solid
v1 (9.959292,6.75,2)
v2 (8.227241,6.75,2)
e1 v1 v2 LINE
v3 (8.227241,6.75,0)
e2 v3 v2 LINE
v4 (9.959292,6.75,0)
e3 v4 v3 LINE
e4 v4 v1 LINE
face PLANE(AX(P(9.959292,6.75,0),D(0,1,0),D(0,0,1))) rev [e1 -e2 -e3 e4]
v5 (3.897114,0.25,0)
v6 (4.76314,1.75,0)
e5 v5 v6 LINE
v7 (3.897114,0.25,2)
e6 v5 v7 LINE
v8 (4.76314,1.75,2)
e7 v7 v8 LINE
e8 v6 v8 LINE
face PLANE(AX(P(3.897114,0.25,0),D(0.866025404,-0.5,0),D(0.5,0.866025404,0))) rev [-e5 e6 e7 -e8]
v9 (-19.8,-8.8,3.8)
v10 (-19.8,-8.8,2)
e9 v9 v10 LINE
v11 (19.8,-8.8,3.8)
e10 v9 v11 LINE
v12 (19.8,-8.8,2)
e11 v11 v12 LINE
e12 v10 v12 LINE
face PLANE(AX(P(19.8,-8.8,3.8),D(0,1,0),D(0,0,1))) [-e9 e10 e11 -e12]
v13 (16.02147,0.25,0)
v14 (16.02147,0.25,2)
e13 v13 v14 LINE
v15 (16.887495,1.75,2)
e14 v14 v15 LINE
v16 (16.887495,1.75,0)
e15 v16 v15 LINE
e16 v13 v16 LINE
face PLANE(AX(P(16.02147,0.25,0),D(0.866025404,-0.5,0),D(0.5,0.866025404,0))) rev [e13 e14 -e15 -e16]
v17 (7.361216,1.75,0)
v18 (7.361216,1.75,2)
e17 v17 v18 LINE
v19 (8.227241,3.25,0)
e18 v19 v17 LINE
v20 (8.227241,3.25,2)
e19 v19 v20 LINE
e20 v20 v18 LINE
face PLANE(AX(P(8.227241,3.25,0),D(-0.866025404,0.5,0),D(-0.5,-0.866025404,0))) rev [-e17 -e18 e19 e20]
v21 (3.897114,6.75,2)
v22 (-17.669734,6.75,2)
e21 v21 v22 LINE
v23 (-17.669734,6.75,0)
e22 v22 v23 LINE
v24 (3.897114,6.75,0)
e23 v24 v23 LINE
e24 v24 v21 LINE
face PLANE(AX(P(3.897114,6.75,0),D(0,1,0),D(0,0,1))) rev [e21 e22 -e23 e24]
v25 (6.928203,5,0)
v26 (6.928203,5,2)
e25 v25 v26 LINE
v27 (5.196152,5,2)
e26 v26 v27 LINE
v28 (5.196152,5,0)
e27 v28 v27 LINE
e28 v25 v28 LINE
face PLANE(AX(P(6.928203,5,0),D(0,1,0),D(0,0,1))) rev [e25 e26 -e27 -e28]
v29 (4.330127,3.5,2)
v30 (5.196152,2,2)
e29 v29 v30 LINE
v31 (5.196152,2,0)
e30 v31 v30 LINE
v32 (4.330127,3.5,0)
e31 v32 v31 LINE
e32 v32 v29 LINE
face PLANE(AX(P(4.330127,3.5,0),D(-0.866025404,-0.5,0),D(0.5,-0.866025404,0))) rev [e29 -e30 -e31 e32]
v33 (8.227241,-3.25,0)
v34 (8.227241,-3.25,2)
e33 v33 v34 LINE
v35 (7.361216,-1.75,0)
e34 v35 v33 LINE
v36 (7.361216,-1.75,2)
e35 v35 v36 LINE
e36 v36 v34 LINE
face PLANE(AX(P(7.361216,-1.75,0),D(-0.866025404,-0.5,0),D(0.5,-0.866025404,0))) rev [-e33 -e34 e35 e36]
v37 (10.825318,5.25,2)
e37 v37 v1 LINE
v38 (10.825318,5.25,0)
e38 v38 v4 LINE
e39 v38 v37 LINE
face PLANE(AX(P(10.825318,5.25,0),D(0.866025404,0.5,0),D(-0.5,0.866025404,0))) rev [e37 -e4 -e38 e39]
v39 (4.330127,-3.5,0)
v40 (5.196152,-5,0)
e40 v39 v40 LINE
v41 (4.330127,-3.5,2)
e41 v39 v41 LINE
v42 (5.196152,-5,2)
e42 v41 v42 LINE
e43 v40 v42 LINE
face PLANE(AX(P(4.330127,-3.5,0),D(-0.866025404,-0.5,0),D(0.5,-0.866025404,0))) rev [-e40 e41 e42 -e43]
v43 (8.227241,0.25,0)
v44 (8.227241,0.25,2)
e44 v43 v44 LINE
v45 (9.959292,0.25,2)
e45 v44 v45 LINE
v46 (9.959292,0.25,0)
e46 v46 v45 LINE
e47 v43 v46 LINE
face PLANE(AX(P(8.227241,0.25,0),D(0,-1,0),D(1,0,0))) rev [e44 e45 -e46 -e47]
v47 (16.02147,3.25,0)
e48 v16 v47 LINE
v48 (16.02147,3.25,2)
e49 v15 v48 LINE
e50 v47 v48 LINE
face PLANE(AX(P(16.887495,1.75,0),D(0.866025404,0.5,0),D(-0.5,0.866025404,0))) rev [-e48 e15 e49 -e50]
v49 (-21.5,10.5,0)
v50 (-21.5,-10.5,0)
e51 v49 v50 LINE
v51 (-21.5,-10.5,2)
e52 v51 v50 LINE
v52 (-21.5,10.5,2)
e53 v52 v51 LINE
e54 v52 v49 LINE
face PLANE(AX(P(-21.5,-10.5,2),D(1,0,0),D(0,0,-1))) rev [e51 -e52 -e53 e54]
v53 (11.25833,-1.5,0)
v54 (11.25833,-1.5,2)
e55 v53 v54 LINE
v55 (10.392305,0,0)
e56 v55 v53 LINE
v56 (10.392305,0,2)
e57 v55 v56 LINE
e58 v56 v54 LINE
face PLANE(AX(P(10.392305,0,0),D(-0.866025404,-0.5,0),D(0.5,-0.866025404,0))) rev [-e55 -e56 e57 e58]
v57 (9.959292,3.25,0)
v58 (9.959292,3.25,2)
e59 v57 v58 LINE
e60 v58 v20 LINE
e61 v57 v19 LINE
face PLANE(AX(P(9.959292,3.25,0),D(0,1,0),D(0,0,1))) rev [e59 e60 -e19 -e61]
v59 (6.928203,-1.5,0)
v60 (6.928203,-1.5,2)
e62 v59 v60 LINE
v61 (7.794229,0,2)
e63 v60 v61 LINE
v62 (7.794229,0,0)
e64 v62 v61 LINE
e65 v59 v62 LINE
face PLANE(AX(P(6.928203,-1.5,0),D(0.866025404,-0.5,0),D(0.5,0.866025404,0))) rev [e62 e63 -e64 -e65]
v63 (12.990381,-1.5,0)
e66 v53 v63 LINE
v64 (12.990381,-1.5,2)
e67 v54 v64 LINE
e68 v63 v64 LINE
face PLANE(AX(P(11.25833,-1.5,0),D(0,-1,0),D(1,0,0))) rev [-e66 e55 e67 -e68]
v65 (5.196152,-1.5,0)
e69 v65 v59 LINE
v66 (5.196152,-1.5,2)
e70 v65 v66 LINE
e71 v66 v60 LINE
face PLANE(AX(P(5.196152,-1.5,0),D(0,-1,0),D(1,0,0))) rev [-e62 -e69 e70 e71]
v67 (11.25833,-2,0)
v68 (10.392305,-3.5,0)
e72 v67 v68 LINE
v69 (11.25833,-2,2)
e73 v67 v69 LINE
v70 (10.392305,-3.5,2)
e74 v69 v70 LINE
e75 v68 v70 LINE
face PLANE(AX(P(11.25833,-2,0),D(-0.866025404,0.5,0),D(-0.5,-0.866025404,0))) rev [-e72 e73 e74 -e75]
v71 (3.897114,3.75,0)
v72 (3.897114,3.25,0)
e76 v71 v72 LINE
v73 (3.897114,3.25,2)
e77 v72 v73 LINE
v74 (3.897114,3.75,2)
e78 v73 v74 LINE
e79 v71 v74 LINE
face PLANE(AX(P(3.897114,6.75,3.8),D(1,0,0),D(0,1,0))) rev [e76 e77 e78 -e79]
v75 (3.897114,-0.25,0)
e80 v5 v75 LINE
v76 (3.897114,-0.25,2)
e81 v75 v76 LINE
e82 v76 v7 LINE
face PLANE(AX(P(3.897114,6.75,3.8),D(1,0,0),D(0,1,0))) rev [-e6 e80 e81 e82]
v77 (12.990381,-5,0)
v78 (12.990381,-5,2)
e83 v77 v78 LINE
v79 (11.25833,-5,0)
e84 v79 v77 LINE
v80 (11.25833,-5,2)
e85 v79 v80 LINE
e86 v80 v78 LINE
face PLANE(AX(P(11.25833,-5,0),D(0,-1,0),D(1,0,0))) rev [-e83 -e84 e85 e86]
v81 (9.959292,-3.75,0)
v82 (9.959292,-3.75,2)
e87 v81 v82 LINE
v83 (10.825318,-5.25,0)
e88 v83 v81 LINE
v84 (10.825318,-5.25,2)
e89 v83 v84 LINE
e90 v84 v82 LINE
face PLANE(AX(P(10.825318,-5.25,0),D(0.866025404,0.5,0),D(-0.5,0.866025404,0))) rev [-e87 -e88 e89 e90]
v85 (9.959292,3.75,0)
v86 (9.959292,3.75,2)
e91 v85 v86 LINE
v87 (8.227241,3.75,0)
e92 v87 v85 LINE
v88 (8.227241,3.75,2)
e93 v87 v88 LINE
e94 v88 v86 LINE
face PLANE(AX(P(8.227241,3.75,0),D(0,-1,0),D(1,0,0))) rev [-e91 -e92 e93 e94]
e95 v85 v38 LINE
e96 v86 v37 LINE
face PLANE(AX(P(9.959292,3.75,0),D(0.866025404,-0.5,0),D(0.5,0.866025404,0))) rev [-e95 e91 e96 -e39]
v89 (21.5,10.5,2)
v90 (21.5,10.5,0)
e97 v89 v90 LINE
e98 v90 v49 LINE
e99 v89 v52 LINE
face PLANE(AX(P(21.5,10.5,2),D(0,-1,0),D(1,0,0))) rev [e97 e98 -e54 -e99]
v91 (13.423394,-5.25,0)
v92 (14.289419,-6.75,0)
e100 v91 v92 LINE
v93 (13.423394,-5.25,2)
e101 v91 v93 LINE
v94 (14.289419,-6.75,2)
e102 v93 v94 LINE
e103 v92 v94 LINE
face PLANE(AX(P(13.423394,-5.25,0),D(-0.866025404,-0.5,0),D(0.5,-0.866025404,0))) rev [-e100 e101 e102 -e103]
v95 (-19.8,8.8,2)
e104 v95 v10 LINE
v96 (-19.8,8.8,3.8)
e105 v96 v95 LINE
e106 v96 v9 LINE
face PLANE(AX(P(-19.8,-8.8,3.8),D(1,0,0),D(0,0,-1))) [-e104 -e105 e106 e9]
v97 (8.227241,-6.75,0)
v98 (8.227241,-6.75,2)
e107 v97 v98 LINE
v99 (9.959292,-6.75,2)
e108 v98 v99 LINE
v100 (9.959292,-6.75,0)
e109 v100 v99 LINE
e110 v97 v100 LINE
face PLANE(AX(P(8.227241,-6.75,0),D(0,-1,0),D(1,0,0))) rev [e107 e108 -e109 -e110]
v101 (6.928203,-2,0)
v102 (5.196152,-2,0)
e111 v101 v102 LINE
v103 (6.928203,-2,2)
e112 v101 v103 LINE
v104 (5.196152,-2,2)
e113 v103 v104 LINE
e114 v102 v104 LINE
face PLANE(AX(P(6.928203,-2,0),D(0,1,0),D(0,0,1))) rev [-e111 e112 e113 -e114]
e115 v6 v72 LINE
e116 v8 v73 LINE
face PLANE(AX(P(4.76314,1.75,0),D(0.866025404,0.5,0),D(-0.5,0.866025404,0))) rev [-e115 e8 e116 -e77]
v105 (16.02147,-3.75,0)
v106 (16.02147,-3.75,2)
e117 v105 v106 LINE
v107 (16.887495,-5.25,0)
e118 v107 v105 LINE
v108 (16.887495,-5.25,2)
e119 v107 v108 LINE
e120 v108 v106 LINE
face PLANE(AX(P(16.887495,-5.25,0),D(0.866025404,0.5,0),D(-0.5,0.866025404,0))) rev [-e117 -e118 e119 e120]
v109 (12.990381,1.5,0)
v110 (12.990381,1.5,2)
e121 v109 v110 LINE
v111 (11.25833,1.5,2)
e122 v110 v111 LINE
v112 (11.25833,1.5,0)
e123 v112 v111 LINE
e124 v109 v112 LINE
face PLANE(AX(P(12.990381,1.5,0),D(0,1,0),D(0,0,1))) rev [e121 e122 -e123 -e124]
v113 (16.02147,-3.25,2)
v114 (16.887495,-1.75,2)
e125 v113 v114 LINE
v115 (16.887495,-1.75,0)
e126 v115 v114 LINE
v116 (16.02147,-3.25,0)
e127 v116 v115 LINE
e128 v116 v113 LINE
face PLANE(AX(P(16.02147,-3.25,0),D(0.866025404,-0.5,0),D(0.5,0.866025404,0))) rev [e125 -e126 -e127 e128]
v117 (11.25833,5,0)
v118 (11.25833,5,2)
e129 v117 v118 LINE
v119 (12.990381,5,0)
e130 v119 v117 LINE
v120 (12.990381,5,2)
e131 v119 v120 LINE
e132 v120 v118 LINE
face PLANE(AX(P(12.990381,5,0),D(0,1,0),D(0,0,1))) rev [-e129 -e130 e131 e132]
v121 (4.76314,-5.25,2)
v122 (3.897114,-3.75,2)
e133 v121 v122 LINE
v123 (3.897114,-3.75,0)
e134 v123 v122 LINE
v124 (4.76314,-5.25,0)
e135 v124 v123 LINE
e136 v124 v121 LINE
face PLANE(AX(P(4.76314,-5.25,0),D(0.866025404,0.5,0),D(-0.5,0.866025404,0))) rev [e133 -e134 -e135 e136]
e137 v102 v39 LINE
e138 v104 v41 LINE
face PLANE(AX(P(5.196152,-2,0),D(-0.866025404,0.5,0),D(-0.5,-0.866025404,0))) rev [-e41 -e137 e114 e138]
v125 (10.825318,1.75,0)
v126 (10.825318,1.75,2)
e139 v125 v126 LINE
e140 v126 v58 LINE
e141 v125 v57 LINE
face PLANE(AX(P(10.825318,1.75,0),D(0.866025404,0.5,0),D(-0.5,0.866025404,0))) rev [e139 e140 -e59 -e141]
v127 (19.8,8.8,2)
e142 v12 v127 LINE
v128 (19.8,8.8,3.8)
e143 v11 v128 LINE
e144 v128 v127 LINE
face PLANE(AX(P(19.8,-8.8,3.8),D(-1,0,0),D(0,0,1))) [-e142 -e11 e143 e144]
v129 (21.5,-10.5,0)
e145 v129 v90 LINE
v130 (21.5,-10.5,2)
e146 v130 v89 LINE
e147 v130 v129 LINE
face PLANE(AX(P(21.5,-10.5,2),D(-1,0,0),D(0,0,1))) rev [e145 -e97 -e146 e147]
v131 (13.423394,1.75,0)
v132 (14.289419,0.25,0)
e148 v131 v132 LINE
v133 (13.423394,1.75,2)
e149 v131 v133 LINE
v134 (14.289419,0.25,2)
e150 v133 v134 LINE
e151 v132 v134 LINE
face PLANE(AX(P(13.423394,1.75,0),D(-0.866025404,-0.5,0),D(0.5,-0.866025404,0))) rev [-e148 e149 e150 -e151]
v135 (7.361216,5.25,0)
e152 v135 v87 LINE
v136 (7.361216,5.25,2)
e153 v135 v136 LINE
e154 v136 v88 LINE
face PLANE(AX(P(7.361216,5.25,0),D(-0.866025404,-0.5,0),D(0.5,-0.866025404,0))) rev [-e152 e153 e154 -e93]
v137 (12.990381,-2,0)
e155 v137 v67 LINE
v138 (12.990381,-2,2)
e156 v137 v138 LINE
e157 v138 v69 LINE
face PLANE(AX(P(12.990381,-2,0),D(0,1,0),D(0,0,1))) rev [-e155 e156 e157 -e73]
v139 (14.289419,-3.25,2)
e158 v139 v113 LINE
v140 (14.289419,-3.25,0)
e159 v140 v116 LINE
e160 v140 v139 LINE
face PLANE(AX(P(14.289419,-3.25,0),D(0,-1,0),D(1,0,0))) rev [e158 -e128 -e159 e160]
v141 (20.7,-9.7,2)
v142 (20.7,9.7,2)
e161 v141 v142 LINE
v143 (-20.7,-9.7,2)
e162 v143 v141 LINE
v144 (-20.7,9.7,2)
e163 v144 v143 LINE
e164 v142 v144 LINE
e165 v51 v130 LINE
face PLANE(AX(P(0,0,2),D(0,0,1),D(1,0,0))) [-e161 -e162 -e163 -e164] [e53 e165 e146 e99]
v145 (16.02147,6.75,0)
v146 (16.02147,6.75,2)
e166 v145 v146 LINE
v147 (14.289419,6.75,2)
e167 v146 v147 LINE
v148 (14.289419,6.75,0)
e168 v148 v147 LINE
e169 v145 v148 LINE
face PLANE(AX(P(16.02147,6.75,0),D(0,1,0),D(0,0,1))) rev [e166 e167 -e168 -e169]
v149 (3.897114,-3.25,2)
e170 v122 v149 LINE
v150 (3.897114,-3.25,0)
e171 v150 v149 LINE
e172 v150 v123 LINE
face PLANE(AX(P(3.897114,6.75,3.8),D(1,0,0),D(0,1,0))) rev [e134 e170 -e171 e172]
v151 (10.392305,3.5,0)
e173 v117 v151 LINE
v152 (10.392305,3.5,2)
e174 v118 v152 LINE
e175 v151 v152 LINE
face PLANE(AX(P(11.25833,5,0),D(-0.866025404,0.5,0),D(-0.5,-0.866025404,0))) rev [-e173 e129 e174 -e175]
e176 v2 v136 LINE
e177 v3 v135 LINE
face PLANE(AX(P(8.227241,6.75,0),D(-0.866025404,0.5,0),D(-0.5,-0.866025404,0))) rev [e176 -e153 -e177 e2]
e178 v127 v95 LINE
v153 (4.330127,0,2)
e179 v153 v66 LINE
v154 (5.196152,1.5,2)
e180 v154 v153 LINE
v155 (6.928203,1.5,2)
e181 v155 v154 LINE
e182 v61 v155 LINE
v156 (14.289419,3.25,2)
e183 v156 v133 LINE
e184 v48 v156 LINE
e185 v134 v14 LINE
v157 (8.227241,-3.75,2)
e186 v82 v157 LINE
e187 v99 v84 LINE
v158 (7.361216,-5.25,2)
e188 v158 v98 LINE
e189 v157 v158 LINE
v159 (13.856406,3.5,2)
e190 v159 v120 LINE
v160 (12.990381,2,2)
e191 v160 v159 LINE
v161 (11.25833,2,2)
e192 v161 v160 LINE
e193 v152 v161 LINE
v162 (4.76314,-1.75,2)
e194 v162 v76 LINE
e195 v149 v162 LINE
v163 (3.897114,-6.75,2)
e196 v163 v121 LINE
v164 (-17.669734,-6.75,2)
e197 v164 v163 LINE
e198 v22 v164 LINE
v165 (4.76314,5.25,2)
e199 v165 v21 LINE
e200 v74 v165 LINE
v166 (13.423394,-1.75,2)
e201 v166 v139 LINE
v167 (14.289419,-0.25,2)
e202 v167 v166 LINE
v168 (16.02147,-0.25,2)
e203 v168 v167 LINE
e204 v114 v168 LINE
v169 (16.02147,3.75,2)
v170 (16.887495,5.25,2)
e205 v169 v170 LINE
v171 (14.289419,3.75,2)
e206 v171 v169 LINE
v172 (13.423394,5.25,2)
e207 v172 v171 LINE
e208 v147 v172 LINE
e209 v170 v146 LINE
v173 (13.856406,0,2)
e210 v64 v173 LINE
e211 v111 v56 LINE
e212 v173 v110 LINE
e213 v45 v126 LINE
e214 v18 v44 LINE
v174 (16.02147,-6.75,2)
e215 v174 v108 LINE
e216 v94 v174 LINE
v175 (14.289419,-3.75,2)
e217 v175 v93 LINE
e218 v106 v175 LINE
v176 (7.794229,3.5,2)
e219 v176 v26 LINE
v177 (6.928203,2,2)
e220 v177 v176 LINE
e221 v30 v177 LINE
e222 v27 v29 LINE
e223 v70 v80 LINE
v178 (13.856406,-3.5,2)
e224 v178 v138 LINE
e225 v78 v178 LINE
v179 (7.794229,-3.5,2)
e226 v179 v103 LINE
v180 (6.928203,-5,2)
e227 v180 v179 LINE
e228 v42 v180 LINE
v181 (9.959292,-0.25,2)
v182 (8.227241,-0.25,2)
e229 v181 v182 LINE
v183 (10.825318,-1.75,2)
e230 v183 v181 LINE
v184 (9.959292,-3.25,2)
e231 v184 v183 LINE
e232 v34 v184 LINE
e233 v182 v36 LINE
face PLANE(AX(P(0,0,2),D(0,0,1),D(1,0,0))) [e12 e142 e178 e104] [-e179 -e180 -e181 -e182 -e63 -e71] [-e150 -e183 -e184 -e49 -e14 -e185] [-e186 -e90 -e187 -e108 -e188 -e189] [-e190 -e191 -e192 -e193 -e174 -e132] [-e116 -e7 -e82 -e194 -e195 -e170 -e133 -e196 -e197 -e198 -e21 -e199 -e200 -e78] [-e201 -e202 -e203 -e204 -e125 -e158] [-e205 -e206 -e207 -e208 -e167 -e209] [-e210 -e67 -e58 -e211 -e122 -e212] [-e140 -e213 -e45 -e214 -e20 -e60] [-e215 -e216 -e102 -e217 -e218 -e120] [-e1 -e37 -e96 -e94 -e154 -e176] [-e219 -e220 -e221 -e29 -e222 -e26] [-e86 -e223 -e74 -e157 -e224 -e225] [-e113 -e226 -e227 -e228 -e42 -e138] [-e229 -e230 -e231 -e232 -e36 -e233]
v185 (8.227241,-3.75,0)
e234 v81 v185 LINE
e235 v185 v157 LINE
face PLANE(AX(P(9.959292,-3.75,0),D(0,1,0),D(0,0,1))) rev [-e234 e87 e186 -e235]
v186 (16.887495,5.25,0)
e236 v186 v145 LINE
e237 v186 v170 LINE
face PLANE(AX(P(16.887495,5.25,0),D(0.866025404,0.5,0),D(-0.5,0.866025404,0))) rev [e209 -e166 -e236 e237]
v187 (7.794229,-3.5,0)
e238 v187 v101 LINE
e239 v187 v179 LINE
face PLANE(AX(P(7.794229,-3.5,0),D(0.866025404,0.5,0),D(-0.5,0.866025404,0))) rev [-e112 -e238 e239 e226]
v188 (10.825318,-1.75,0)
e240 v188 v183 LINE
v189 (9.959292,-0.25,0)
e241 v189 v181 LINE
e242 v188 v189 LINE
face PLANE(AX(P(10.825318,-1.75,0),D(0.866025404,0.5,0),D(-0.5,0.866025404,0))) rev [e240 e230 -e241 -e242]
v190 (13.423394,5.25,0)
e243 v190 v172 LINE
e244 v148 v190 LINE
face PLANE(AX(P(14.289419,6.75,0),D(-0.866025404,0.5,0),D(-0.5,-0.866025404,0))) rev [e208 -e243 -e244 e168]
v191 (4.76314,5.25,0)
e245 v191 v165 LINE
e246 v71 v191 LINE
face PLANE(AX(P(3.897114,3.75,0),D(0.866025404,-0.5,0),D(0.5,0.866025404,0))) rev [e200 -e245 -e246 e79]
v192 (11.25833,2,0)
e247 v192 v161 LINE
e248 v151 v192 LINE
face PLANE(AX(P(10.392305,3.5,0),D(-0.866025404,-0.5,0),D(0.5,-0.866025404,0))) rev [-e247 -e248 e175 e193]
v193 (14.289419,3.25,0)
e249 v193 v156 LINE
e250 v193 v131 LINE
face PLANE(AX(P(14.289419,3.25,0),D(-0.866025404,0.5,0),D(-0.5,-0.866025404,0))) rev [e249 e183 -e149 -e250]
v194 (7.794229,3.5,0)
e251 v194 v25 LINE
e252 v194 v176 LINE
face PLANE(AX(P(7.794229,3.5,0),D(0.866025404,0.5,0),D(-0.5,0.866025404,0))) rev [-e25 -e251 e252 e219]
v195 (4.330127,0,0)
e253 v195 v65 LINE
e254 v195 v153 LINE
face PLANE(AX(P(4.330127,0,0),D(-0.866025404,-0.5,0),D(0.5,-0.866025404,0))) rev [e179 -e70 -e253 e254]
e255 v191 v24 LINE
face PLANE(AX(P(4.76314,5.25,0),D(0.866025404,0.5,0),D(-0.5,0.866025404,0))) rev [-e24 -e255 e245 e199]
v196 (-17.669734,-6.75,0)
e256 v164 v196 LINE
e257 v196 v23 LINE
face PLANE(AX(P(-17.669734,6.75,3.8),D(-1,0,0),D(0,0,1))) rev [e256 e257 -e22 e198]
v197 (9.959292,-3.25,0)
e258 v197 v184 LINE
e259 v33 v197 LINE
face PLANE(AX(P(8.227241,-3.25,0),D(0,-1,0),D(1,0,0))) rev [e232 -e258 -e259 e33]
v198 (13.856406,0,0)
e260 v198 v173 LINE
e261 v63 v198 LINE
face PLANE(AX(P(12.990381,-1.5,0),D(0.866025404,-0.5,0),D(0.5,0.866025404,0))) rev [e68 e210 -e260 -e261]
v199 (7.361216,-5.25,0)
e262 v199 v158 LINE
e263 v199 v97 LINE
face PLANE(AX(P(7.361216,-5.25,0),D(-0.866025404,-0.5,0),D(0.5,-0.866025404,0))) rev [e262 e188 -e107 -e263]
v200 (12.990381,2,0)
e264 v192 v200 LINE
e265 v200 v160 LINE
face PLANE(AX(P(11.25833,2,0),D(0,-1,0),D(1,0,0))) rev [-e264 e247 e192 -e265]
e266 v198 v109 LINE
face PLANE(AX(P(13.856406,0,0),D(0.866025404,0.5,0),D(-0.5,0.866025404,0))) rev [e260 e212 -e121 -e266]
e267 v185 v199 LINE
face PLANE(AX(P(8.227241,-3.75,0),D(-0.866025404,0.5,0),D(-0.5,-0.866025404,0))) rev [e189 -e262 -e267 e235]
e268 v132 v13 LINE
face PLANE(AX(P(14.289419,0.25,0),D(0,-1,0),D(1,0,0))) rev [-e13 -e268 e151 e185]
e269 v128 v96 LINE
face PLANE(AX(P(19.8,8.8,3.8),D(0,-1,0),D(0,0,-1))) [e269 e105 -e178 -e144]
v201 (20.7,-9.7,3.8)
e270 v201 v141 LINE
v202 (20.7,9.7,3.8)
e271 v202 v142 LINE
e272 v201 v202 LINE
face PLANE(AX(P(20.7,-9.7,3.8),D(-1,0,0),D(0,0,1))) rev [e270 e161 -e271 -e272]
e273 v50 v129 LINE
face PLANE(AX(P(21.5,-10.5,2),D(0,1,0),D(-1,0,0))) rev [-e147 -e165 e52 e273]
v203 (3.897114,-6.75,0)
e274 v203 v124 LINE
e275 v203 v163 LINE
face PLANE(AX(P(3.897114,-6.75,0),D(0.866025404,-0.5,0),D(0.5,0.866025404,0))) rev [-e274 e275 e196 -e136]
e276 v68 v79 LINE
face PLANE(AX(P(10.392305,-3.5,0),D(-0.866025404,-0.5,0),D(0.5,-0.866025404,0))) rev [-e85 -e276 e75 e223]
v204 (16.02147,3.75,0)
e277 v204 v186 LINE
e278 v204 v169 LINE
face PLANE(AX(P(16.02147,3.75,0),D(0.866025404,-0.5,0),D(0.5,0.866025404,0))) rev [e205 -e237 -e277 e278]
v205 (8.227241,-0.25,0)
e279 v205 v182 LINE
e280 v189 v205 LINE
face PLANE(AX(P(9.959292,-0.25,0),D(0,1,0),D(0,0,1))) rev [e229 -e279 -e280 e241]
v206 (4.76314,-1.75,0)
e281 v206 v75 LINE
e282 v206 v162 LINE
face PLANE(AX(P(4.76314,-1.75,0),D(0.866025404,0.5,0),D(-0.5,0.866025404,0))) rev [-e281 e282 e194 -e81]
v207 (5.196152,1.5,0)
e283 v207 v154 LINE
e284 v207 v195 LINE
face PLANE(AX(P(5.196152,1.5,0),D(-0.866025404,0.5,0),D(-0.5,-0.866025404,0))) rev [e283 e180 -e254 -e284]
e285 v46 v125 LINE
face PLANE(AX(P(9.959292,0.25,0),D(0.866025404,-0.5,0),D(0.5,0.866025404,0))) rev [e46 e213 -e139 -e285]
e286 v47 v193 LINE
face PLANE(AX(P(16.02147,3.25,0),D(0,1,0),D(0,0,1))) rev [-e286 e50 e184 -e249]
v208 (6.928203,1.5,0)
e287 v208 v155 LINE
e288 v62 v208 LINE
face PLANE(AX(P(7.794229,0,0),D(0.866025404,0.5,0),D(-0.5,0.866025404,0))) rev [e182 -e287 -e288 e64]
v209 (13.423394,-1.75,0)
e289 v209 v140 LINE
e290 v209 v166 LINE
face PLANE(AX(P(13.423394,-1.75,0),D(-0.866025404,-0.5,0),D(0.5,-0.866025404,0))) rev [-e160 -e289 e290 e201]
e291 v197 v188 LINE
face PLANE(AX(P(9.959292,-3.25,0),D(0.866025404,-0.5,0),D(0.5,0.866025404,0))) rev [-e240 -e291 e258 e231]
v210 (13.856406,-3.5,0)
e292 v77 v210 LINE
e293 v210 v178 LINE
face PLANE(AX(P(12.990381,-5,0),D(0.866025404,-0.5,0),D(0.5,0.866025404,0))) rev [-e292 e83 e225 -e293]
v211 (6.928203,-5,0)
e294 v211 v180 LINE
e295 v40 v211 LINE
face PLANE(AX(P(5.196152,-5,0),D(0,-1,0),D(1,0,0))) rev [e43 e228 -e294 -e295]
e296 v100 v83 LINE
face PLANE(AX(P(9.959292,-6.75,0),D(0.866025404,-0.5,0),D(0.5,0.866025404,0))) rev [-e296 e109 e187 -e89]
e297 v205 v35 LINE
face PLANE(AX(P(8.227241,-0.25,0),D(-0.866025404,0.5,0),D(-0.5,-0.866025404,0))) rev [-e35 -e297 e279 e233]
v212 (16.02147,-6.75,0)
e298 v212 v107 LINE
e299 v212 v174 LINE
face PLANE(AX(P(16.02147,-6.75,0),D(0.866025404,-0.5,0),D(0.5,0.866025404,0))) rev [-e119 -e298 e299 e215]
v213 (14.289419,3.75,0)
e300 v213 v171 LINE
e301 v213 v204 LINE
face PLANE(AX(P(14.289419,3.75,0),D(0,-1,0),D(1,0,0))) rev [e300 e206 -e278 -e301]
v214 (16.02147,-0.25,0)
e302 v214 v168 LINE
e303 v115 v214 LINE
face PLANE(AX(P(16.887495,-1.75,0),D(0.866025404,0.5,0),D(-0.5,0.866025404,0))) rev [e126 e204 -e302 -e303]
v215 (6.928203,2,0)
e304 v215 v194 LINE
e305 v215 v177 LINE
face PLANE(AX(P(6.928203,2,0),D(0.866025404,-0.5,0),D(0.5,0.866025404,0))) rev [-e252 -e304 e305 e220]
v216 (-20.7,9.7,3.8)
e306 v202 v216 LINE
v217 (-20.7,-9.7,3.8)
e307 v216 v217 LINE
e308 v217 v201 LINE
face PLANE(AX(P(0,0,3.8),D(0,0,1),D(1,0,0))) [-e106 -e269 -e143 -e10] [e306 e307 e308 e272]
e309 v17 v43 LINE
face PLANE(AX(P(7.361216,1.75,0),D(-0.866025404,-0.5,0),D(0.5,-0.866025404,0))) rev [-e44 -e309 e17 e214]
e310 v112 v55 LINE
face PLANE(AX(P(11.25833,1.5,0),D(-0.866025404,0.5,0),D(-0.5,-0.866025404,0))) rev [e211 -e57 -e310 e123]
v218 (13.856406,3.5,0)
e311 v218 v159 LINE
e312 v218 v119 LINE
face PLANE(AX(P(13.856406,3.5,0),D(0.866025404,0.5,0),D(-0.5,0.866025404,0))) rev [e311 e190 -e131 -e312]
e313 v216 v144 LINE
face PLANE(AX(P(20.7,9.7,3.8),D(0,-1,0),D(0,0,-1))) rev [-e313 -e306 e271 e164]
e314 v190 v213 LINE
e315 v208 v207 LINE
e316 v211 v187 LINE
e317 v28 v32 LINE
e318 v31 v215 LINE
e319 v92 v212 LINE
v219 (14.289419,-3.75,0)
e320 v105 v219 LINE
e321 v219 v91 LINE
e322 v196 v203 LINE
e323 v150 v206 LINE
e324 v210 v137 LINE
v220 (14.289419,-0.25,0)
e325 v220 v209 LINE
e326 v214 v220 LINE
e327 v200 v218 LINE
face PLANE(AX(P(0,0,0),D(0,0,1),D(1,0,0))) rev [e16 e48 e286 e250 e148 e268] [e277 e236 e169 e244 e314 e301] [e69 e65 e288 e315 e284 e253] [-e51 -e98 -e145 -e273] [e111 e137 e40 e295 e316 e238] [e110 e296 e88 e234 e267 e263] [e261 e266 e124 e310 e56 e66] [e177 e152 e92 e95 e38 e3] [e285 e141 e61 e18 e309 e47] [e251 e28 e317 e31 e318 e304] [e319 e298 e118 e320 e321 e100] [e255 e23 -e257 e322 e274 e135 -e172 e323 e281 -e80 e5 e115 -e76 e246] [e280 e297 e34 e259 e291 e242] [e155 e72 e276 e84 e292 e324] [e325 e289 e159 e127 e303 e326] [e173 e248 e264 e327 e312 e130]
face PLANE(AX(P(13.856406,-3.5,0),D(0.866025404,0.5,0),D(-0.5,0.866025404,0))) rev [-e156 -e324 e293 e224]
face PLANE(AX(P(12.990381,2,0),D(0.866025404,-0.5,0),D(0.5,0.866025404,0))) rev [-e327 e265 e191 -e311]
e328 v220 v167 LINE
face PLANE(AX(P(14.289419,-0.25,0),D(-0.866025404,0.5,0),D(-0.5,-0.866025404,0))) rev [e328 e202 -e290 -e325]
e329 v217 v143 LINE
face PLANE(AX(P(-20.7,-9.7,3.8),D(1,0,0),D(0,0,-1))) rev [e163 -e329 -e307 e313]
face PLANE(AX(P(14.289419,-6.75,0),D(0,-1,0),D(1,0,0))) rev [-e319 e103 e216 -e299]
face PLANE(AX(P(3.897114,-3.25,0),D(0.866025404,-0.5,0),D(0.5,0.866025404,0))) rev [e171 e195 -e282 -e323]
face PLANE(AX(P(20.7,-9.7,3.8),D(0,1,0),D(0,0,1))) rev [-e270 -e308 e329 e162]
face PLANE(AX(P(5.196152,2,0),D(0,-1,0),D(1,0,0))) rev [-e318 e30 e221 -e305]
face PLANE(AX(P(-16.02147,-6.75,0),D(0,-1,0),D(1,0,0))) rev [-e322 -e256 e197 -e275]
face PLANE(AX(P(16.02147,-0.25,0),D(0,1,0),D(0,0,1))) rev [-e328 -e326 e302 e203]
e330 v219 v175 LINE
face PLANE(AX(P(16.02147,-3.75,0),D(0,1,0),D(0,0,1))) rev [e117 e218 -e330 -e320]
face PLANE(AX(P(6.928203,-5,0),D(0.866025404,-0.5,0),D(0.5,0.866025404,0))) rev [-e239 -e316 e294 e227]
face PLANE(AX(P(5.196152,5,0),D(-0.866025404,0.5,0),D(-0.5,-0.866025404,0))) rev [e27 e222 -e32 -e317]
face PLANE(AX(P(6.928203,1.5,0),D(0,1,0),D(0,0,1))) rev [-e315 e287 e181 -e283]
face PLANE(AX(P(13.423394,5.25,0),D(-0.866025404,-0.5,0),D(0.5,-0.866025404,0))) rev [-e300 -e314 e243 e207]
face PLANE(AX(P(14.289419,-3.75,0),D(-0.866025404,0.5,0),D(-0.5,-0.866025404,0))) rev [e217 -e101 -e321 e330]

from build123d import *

# Parameters (mm, degrees)
SKETCH1_W           = 43
SKETCH1_H           = 21
BOSS_EXTRUDE1_DEPTH = 2
SKETCH2_W           = 41.4
SKETCH2_H           = 19.4
SKETCH2_W_2         = 39.6
SKETCH2_H_2         = 17.6
BOSS_EXTRUDE2_DEPTH = 1.8
CUT_EXTRUDE1_DEPTH  = 25.010414407
FILL_PATTERN1_DEPTH = 2
SKETCH4_W           = 21.566848352
SKETCH4_H           = 13.5
CUT_EXTRUDE4_DEPTH  = 25.226844615


# Read off the part's stored shape, not the designer's step: Fill Pattern1
with BuildPart() as part:
    # Sketch1 → Boss-Extrude1 (new body)
    with BuildSketch(Plane.XY):
        Rectangle(SKETCH1_W, SKETCH1_H)
    extrude(amount=BOSS_EXTRUDE1_DEPTH)

    # Sketch2 → Boss-Extrude2 (add)
    with BuildSketch(Plane.XY.offset(2)):
        Rectangle(SKETCH2_W, SKETCH2_H)
        Rectangle(SKETCH2_W_2, SKETCH2_H_2, mode=Mode.SUBTRACT)
    extrude(amount=BOSS_EXTRUDE2_DEPTH)

    # Sketch3 → Cut-Extrude1 (cut, through all)
    with BuildSketch(Plane.XY.offset(2)):
        Polygon((-0.866025404, 1.5), (-1.732050808, 0), (-0.866025404, -1.5), (0.866025404, -1.5), (1.732050808, 0), (0.866025404, 1.5), align=None)
    extrude(amount=-CUT_EXTRUDE1_DEPTH, mode=Mode.SUBTRACT)

    # Fill Pattern1 outline → Fill Pattern1 (cut)
    with BuildSketch(Plane.XY):
        Polygon((7.794228634, 0), (6.92820323, 1.5), (5.196152423, 1.5), (4.330127019, 0), (5.196152423, -1.5), (6.92820323, -1.5), align=None)
        Polygon((13.856406461, 0), (12.990381057, 1.5), (11.258330249, 1.5), (10.392304845, 0), (11.258330249, -1.5), (12.990381057, -1.5), align=None)
        Polygon((-4.330127019, 0), (-5.196152423, 1.5), (-6.92820323, 1.5), (-7.794228634, 0), (-6.92820323, -1.5), (-5.196152423, -1.5), align=None)
        Polygon((-10.392304845, 0), (-11.258330249, 1.5), (-12.990381057, 1.5), (-13.856406461, 0), (-12.990381057, -1.5), (-11.258330249, -1.5), align=None)
        Polygon((-2.165063509, 3.75), (-1.299038106, 5.25), (-2.165063509, 6.75), (-3.897114317, 6.75), (-4.763139721, 5.25), (-3.897114317, 3.75), align=None)
        Polygon((3.897114317, -6.75), (4.763139721, -5.25), (3.897114317, -3.75), (2.165063509, -3.75), (1.299038106, -5.25), (2.165063509, -6.75), align=None)
        Polygon((-3.897114317, -6.75), (-2.165063509, -6.75), (-1.299038106, -5.25), (-2.165063509, -3.75), (-3.897114317, -3.75), (-4.763139721, -5.25), align=None)
        Polygon((2.165063509, 3.75), (3.897114317, 3.75), (4.763139721, 5.25), (3.897114317, 6.75), (2.165063509, 6.75), (1.299038106, 5.25), align=None)
        Polygon((16.887495374, -5.25), (16.02146997, -3.75), (14.289419162, -3.75), (13.423393759, -5.25), (14.289419162, -6.75), (16.02146997, -6.75), align=None)
        Polygon((-7.361215932, -5.25), (-8.227241336, -3.75), (-9.959292144, -3.75), (-10.825317547, -5.25), (-9.959292144, -6.75), (-8.227241336, -6.75), align=None)
        Polygon((10.825317547, -5.25), (9.959292144, -3.75), (8.227241336, -3.75), (7.361215932, -5.25), (8.227241336, -6.75), (9.959292144, -6.75), align=None)
        Polygon((-13.423393759, -5.25), (-14.289419162, -3.75), (-16.02146997, -3.75), (-16.887495374, -5.25), (-16.02146997, -6.75), (-14.289419162, -6.75), align=None)
        Polygon((9.959292144, 3.75), (10.825317547, 5.25), (9.959292144, 6.75), (8.227241336, 6.75), (7.361215932, 5.25), (8.227241336, 3.75), align=None)
        Polygon((-10.392304845, 3.5), (-11.258330249, 5), (-12.990381057, 5), (-13.856406461, 3.5), (-12.990381057, 2), (-11.258330249, 2), align=None)
        Polygon((13.856406461, 3.5), (12.990381057, 5), (11.258330249, 5), (10.392304845, 3.5), (11.258330249, 2), (12.990381057, 2), align=None)
        Polygon((1.732050808, 3.5), (0.866025404, 5), (-0.866025404, 5), (-1.732050808, 3.5), (-0.866025404, 2), (0.866025404, 2), align=None)
        Polygon((-4.330127019, 3.5), (-5.196152423, 5), (-6.92820323, 5), (-7.794228634, 3.5), (-6.92820323, 2), (-5.196152423, 2), align=None)
        Polygon((7.794228634, 3.5), (6.92820323, 5), (5.196152423, 5), (4.330127019, 3.5), (5.196152423, 2), (6.92820323, 2), align=None)
        Polygon((-8.227241336, -3.25), (-7.361215932, -1.75), (-8.227241336, -0.25), (-9.959292144, -0.25), (-10.825317547, -1.75), (-9.959292144, -3.25), align=None)
        Polygon((-16.02146997, -3.25), (-14.289419162, -3.25), (-13.423393759, -1.75), (-14.289419162, -0.25), (-16.02146997, -0.25), (-16.887495374, -1.75), align=None)
        Polygon((-7.361215932, 5.25), (-8.227241336, 6.75), (-9.959292144, 6.75), (-10.825317547, 5.25), (-9.959292144, 3.75), (-8.227241336, 3.75), align=None)
        Polygon((-13.423393759, 5.25), (-14.289419162, 6.75), (-16.02146997, 6.75), (-16.887495374, 5.25), (-16.02146997, 3.75), (-14.289419162, 3.75), align=None)
        Polygon((16.887495374, 5.25), (16.02146997, 6.75), (14.289419162, 6.75), (13.423393759, 5.25), (14.289419162, 3.75), (16.02146997, 3.75), align=None)
        Polygon((-13.423393759, 1.75), (-14.289419162, 3.25), (-16.02146997, 3.25), (-16.887495374, 1.75), (-16.02146997, 0.25), (-14.289419162, 0.25), align=None)
        Polygon((10.825317547, 1.75), (9.959292144, 3.25), (8.227241336, 3.25), (7.361215932, 1.75), (8.227241336, 0.25), (9.959292144, 0.25), align=None)
        Polygon((16.887495374, 1.75), (16.02146997, 3.25), (14.289419162, 3.25), (13.423393759, 1.75), (14.289419162, 0.25), (16.02146997, 0.25), align=None)
        Polygon((-1.299038106, 1.75), (-2.165063509, 3.25), (-3.897114317, 3.25), (-4.763139721, 1.75), (-3.897114317, 0.25), (-2.165063509, 0.25), align=None)
        Polygon((-7.361215932, 1.75), (-8.227241336, 3.25), (-9.959292144, 3.25), (-10.825317547, 1.75), (-9.959292144, 0.25), (-8.227241336, 0.25), align=None)
        Polygon((4.763139721, 1.75), (3.897114317, 3.25), (2.165063509, 3.25), (1.299038106, 1.75), (2.165063509, 0.25), (3.897114317, 0.25), align=None)
        Polygon((-11.258330249, -5), (-10.392304845, -3.5), (-11.258330249, -2), (-12.990381057, -2), (-13.856406461, -3.5), (-12.990381057, -5), align=None)
        Polygon((4.763139721, -1.75), (3.897114317, -0.25), (2.165063509, -0.25), (1.299038106, -1.75), (2.165063509, -3.25), (3.897114317, -3.25), align=None)
        Polygon((16.887495374, -1.75), (16.02146997, -0.25), (14.289419162, -0.25), (13.423393759, -1.75), (14.289419162, -3.25), (16.02146997, -3.25), align=None)
        Polygon((10.825317547, -1.75), (9.959292144, -0.25), (8.227241336, -0.25), (7.361215932, -1.75), (8.227241336, -3.25), (9.959292144, -3.25), align=None)
        Polygon((-1.299038106, -1.75), (-2.165063509, -0.25), (-3.897114317, -0.25), (-4.763139721, -1.75), (-3.897114317, -3.25), (-2.165063509, -3.25), align=None)
        Polygon((1.732050808, -3.5), (0.866025404, -2), (-0.866025404, -2), (-1.732050808, -3.5), (-0.866025404, -5), (0.866025404, -5), align=None)
        Polygon((13.856406461, -3.5), (12.990381057, -2), (11.258330249, -2), (10.392304845, -3.5), (11.258330249, -5), (12.990381057, -5), align=None)
        Polygon((7.794228634, -3.5), (6.92820323, -2), (5.196152423, -2), (4.330127019, -3.5), (5.196152423, -5), (6.92820323, -5), align=None)
        Polygon((-4.330127019, -3.5), (-5.196152423, -2), (-6.92820323, -2), (-7.794228634, -3.5), (-6.92820323, -5), (-5.196152423, -5), align=None)
    extrude(amount=FILL_PATTERN1_DEPTH, mode=Mode.SUBTRACT)

    # Sketch4 → Cut-Extrude4 (cut, through all)
    with BuildSketch(Plane(origin=(0, 0, 0), x_dir=(-1, 0, 0), z_dir=(0, 0, -1))):
        with Locations((6.886309859, 0)):
            Rectangle(SKETCH4_W, SKETCH4_H)
    extrude(amount=-CUT_EXTRUDE4_DEPTH, mode=Mode.SUBTRACT)


solid = part.part
